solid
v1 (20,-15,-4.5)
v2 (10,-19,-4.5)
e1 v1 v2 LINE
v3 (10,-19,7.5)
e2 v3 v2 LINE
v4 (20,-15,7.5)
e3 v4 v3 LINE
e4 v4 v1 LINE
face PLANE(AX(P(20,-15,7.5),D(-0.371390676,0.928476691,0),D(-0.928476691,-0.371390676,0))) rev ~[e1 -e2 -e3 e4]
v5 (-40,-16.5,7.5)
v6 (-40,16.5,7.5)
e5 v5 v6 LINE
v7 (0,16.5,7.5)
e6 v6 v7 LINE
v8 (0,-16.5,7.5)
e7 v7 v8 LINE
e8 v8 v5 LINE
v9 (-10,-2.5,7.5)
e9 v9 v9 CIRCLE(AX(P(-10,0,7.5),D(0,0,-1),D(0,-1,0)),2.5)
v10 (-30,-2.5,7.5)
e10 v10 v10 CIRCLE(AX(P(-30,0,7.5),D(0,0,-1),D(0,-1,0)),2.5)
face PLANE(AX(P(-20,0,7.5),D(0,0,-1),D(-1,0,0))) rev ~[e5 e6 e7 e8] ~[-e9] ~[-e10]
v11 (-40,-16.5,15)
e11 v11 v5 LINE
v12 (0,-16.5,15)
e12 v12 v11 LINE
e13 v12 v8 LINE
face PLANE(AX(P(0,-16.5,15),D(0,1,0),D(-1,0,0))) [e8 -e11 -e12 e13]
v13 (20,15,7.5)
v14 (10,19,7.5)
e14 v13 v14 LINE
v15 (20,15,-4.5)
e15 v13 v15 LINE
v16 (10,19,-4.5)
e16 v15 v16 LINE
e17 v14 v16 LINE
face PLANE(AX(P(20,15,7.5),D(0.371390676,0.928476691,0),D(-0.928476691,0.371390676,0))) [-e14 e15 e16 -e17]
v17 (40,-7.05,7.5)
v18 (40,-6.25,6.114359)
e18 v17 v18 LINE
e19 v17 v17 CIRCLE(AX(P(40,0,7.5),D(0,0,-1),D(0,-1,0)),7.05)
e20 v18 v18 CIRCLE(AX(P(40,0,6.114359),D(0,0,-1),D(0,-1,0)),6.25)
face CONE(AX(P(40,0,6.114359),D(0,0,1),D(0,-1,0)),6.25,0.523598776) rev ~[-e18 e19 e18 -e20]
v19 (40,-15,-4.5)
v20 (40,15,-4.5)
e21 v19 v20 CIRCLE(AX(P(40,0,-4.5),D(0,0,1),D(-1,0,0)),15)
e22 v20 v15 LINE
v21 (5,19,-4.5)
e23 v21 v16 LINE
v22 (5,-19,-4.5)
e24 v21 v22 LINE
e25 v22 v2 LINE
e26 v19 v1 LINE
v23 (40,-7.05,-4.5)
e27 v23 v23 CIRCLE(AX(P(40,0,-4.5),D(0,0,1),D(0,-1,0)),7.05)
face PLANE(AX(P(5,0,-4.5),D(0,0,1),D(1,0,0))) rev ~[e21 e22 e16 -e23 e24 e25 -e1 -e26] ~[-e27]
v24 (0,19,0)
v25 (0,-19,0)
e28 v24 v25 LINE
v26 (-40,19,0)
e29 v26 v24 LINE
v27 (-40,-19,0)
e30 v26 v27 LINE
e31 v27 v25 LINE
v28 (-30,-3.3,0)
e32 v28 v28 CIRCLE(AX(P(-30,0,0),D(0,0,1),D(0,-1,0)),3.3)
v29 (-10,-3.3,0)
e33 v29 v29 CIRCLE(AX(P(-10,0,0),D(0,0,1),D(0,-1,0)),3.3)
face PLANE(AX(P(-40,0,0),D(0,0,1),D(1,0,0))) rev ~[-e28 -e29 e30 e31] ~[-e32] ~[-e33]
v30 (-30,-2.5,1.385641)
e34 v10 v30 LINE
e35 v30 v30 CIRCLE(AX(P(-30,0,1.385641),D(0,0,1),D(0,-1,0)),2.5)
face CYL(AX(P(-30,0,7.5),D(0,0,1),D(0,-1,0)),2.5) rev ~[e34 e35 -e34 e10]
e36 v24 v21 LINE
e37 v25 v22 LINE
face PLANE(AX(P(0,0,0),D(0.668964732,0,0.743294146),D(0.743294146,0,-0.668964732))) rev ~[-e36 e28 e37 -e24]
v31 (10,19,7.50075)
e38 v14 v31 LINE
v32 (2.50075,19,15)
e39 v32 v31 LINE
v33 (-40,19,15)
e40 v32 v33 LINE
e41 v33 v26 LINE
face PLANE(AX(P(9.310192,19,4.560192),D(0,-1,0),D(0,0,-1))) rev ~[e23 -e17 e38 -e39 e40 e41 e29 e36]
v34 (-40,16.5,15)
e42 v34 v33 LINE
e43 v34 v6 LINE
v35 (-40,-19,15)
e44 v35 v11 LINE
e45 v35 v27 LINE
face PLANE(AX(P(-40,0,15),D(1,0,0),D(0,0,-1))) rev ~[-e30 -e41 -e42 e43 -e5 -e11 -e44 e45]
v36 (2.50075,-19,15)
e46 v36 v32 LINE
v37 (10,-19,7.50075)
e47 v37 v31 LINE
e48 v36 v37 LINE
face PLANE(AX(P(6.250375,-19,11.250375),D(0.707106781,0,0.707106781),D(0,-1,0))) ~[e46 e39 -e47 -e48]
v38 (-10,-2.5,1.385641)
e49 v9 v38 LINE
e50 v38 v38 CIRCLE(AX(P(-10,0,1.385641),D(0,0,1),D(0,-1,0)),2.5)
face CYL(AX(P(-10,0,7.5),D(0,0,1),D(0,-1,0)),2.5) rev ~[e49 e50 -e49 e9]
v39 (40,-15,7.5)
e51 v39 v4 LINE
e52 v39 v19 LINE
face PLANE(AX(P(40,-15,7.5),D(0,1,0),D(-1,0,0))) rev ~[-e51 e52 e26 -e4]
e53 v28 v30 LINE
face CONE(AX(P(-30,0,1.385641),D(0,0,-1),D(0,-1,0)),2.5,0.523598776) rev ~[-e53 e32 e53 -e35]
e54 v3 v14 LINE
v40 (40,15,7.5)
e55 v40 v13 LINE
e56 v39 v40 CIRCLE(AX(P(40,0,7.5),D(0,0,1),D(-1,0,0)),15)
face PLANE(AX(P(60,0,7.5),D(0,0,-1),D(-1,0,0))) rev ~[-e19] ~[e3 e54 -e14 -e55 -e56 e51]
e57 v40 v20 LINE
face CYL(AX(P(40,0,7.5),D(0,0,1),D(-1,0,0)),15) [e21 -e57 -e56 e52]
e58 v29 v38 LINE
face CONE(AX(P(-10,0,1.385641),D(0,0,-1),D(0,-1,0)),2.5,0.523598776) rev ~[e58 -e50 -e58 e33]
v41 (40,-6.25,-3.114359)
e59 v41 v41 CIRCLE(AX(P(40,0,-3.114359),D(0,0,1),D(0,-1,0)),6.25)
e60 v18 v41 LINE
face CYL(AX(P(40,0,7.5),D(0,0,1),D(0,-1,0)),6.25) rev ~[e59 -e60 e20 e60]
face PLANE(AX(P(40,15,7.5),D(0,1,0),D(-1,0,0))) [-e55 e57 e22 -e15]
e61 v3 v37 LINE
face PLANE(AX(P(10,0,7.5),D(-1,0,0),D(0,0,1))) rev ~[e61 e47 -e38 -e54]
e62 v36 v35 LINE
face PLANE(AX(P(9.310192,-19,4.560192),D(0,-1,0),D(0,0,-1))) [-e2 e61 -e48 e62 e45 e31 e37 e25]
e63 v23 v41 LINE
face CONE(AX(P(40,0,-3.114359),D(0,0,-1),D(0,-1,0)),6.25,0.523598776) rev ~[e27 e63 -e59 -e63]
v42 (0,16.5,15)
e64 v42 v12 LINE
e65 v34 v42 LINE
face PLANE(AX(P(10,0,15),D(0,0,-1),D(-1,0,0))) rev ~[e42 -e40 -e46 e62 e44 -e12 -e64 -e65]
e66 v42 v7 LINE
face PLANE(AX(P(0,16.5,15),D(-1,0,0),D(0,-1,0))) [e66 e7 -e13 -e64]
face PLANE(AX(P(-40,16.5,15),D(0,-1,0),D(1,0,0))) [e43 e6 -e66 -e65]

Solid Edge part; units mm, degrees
sketch "Sketch1" plane through (0, 0, 0) normal (0, -1, 0) x (1, 0, 0)
  line L0 (-40, 15) -> (-40, 0)
  line L1 (-40, 0) -> (0, 0)
  line L2 (0, 0) -> (5, -4.5)
  line L3 (5, -4.5) -> (60, -4.5)
  line L4 (60, -4.5) -> (60, 7.5)
  line L5 (60, 7.5) -> (10, 7.5)
  line L6 (10, 7.5) -> (10, 15)
  line L7 (10, 15) -> (-40, 15)
  dimension "D1" = 15
  dimension "D2" = 40
  dimension "D3" = 7.5
  dimension "D4" = 50
  dimension "D5" = 50
  dimension "D6" = 12
  dimension "D7" = 5
extrude "Protrusion1" add sketch "Sketch1" along normal mid plane 38
sketch "Sketch2" plane through (-15, 0, 15) normal (0, 0, 1) x (1, 0, 0)
  line L0 (-25, 16.5) -> (15, 16.5)
  line L1 (15, 16.5) -> (15, -16.5)
  line L2 (15, -16.5) -> (-25, -16.5)
  line L3 (-25, -16.5) -> (-25, 16.5)
  dimension "D1" = 33
extrude "ExtrudedCutout_1" cut sketch "Sketch2" against normal blind 7.5
hole "Hole_1" at (-10, 0, 7.5) direction (0, 0, -1) diameter 5 end up to next
hole "Hole1" at (-30, 0, 7.5) direction (0, 0, -1) diameter 5 end up to next
hole "Hole_3" at (40, 0, 7.5) direction (0, 0, -1) diameter 12.5 end up to next
sketch "Sketch3" plane through (35, 0, 7.5) normal (0, 0, 1) x (-1, 0, 0)
  line L0 (15, -15) -> (25, -19)
  line L1 (-5, -15) -> (15, -15)
  arc A0 (-5, 15) -> (-5, -15) centre (-5, 0) ccw
  line L2 (-5, 15) -> (15, 15)
  line L3 (15, 15) -> (25, 19)
  dimension "D1" = 55
  dimension "D2" = 10
extrude "Cutout1" cut sketch "Sketch3" against normal through all material side at (15.0186, 17.0464, 7.5)
chamfer "Chamfer_1" distance 7.5 angle 45 1 edges at (10, 0, 15)
chamfer "Chamfer_2" distance 0.8 angle 60 4 edges at (33.75, 0, -4.5) (46.25, 0, 7.5) (-12.5, 0, 0) (-32.5, 0, 0) measured on face at (47.95, -12.2867, 7.5) measured on face at (12.8333, -12.2867, -4.5) measured on face at (-33.7333, -12.2867, 0)
properties material "Polyethylene, low density"
